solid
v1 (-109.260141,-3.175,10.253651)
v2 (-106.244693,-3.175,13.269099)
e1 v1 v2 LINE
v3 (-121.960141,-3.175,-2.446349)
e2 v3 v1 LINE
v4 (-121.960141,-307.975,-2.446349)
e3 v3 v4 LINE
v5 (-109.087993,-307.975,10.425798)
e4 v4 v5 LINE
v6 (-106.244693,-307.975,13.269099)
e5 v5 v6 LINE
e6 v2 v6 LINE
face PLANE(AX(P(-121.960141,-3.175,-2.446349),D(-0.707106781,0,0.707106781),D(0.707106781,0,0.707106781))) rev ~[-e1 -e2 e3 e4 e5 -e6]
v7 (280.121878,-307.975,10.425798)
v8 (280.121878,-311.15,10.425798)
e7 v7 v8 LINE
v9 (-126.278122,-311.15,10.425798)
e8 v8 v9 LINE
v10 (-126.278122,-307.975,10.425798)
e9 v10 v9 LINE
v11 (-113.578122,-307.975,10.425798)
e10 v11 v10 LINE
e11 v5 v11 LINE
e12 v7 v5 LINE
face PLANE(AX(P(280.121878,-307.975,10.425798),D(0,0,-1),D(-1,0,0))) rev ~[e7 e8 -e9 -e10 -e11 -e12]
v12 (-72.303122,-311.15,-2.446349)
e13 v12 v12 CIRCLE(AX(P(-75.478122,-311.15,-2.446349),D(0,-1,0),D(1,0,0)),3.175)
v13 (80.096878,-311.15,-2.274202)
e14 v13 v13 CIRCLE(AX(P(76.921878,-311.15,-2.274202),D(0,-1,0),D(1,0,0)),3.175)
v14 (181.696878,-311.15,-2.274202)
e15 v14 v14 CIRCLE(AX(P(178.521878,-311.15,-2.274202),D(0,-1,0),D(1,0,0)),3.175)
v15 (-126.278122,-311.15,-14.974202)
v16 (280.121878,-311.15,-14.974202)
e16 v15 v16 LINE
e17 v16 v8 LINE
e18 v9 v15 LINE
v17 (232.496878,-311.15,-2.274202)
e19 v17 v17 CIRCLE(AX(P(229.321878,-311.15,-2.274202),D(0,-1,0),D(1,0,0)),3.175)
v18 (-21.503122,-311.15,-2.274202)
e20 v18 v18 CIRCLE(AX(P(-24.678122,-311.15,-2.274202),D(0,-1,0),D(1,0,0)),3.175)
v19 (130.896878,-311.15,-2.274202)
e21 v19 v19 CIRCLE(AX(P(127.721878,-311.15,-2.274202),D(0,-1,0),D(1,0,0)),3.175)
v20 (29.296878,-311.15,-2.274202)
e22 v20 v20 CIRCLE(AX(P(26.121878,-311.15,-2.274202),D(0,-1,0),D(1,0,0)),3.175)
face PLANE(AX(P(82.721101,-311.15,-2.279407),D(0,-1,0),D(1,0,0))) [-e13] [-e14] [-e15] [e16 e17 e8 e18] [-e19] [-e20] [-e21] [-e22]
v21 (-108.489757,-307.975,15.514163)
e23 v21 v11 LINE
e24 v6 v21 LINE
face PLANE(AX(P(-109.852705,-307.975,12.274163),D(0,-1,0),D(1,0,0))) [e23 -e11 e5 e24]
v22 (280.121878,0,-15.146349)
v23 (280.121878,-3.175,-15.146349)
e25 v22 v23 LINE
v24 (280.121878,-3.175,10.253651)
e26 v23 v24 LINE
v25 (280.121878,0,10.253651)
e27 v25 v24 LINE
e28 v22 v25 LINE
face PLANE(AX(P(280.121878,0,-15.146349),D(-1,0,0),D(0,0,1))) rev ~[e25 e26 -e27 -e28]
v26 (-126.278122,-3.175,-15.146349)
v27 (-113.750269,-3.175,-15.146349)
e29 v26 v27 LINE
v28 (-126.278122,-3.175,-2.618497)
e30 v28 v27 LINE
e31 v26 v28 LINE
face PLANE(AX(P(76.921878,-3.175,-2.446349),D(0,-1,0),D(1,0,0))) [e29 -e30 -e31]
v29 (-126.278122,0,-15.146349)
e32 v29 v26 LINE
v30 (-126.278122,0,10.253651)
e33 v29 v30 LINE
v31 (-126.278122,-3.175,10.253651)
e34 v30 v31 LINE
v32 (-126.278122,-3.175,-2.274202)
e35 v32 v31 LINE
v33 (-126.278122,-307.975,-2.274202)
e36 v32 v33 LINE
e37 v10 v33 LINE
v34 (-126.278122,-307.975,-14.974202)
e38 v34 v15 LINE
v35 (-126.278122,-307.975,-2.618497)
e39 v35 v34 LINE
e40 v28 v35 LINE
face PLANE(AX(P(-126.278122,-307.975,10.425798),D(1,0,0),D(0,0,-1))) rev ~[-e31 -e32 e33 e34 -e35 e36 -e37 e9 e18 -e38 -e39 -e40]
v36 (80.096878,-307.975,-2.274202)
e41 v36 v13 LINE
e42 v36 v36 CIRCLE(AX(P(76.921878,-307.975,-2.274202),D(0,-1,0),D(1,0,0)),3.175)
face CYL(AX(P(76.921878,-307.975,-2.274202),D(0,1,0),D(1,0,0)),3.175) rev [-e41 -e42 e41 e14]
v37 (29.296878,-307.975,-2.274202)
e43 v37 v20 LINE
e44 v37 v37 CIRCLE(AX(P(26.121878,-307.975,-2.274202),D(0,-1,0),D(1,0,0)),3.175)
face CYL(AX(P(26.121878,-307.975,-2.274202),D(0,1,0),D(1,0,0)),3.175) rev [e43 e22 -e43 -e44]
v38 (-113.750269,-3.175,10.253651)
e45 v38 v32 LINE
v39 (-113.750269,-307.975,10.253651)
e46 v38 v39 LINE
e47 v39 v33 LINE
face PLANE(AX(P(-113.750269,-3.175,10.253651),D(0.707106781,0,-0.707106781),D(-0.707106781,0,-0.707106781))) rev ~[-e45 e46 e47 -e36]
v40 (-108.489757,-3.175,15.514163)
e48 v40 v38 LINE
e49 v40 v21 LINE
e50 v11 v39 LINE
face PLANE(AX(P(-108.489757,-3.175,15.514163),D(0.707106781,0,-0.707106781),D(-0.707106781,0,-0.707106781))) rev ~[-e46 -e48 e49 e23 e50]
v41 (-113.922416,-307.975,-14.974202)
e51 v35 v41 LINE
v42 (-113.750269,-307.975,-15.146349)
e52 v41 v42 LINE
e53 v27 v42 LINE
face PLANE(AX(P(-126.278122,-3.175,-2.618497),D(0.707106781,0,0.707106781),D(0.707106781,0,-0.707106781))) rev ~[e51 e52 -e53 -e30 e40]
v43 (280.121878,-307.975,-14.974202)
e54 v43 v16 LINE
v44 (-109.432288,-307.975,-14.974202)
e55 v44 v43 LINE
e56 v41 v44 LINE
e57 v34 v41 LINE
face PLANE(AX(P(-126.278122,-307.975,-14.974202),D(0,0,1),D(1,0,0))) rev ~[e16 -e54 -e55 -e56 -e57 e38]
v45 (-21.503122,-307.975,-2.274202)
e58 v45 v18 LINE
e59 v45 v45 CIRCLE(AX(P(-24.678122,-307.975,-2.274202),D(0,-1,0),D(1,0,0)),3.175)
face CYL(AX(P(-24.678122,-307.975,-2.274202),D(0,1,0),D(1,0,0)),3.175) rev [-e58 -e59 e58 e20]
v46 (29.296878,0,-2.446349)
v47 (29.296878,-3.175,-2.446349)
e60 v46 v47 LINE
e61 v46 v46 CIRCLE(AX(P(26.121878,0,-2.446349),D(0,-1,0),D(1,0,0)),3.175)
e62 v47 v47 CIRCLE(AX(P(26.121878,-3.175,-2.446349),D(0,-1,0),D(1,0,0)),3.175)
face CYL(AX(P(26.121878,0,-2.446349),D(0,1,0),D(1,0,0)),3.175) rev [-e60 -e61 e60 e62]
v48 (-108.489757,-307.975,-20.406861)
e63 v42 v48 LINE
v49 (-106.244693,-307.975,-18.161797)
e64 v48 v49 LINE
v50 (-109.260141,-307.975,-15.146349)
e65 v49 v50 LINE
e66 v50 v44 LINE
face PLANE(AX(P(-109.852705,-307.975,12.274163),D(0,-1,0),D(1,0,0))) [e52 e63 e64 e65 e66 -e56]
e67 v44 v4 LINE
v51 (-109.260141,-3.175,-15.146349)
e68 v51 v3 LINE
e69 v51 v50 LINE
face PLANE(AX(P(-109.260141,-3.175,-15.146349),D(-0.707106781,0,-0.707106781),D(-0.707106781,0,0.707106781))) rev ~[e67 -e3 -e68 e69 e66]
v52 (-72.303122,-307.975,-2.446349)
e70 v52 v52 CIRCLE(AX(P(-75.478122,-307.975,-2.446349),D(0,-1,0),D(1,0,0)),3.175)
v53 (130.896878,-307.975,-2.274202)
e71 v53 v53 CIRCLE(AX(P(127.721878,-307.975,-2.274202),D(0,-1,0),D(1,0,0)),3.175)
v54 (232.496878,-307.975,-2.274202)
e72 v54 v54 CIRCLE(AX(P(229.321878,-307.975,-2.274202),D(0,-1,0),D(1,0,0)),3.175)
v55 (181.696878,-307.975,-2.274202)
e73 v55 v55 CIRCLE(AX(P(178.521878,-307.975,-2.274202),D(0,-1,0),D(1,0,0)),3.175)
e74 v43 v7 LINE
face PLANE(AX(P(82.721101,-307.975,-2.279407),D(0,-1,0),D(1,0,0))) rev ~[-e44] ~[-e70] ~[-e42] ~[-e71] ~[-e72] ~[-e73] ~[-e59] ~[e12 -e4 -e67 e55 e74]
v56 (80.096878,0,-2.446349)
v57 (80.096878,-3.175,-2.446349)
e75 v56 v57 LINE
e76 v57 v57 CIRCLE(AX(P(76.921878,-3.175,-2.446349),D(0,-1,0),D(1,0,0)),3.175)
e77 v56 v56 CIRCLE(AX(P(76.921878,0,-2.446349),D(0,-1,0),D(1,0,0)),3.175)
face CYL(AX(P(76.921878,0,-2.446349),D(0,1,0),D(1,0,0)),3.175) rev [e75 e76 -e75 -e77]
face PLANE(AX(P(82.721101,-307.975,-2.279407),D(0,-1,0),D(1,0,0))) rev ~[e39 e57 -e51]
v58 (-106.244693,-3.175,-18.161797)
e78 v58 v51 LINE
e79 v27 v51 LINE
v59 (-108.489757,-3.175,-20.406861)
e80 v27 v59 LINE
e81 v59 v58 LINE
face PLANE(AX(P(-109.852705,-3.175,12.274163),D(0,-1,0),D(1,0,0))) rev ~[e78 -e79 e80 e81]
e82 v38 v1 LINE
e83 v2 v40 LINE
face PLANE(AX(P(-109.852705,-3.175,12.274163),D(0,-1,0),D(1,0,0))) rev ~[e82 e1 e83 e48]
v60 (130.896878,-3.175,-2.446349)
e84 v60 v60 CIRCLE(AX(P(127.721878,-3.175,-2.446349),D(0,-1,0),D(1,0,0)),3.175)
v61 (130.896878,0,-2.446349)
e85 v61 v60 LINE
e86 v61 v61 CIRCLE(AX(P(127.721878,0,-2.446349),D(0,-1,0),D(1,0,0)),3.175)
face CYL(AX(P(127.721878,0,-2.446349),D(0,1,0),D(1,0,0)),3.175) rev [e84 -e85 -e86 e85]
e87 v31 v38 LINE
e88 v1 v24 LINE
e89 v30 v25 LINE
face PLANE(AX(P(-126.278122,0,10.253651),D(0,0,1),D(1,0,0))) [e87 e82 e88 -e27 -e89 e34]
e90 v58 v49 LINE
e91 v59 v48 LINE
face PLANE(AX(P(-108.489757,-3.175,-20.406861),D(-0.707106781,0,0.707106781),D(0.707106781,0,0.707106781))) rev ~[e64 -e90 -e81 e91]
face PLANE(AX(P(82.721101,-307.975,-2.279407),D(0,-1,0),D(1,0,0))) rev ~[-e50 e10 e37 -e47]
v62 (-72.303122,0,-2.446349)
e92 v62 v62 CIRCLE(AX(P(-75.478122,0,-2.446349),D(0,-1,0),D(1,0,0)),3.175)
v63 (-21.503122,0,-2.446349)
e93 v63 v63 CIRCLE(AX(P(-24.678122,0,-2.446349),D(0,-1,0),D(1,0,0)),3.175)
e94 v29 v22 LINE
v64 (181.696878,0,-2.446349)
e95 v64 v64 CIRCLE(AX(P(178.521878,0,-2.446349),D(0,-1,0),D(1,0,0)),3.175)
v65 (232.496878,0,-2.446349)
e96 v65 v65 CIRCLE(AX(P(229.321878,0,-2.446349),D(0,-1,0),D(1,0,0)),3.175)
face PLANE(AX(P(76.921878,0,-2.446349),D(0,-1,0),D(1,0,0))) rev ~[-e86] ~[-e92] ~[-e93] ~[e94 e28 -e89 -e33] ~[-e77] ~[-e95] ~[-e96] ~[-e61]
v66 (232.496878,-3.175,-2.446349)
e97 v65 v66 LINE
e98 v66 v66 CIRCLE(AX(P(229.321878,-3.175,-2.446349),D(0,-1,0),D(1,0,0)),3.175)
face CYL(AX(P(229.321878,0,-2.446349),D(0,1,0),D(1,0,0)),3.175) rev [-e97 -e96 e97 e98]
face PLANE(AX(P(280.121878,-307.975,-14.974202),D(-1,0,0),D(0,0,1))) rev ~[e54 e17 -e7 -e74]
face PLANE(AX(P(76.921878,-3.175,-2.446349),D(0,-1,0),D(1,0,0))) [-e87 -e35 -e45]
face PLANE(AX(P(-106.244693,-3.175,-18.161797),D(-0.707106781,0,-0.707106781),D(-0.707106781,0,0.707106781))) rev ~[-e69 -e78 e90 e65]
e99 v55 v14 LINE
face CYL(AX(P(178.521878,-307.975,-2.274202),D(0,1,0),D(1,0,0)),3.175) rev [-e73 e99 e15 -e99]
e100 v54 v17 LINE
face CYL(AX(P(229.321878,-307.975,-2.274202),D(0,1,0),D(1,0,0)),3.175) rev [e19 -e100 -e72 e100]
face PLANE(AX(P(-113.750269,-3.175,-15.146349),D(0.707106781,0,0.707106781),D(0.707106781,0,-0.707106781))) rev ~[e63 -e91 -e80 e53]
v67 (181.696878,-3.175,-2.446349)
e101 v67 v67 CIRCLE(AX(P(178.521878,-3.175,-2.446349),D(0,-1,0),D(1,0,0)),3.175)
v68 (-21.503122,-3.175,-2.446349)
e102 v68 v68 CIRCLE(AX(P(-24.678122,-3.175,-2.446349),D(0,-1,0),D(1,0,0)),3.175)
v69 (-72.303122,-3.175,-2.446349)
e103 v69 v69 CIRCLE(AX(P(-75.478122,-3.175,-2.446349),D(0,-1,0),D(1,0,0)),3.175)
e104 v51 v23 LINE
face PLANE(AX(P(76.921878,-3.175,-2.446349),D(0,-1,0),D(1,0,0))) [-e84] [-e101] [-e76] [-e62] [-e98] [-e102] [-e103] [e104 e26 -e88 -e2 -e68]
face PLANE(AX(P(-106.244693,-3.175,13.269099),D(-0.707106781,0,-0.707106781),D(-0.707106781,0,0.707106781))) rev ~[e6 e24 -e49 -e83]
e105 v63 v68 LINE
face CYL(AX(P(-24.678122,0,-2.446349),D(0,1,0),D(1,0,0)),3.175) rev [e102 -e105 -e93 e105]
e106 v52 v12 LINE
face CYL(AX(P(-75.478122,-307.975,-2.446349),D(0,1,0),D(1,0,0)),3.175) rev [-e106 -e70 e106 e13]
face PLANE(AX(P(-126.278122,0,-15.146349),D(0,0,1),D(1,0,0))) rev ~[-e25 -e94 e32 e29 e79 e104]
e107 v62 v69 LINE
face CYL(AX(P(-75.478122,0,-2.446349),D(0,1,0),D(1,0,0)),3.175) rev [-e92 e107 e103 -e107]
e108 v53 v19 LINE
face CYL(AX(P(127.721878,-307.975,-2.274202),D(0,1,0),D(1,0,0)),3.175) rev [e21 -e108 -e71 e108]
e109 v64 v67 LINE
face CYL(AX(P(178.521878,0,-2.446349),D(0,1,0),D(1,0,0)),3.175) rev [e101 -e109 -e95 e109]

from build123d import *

# Parameters (mm, degrees)
F0_W     = 406.4
F0_H     = 25.4
F0_R     = 3.175
F1_DEPTH = 3.175
F3_DEPTH = 304.8
F4_R     = 3.175
F5_DEPTH = 3.175


# Not quite as in the source:
# - a length typed as a fraction of an inch, garbled in the dataset ("3 / 203.2 mm" for 3/8 in), is restored


with BuildPart() as f1:
    # F0 (on Front) → F1 (new body)
    with BuildSketch(Plane.XZ):
        with Locations((76.9218784556, -2.4463492446)):
            Rectangle(F0_W, F0_H)
        with Locations((-75.4781215444, -2.4463492446)):
            Circle(F0_R, mode=Mode.SUBTRACT)
        with Locations((-24.6781215444, -2.4463492446)):
            Circle(F0_R, mode=Mode.SUBTRACT)
        with Locations((26.1218784556, -2.4463492446)):
            Circle(F0_R, mode=Mode.SUBTRACT)
        with Locations((76.9218784556, -2.4463492446)):
            Circle(F0_R, mode=Mode.SUBTRACT)
        with Locations((127.7218784556, -2.4463492446)):
            Circle(F0_R, mode=Mode.SUBTRACT)
        with Locations((178.5218784556, -2.4463492446)):
            Circle(F0_R, mode=Mode.SUBTRACT)
        with Locations((229.3218784556, -2.4463492446)):
            Circle(F0_R, mode=Mode.SUBTRACT)
    extrude(amount=F1_DEPTH)

    # F2 (on face) → F3 (join)
    with BuildSketch(Plane.XZ.offset(3.175)):
        Polygon((-108.4897565831, 15.5141629976), (-113.7502688252, 10.2536507554), (-109.2601407647, 10.2536507554), (-106.2446925528, 13.2690989673), align=None)
        Polygon((-113.7502688252, 10.2536507554), (-126.2781215444, -2.2742019637), (-126.2781215444, -2.4463492446), (-126.2781215444, -2.6184965255), (-113.7502688252, -15.1463492446), (-109.2601407647, -15.1463492446), (-121.9601407647, -2.4463492446), (-109.2601407647, 10.2536507554), align=None)
        Polygon((-109.2601407647, -15.1463492446), (-113.7502688252, -15.1463492446), (-108.4897565831, -20.4068614867), (-106.2446925528, -18.1617974564), align=None)
    extrude(amount=F3_DEPTH)

    # F4 (on face) → F5 (join)
    with BuildSketch(Plane.XZ.offset(307.975)):
        Polygon((280.1218784556, 10.4257980363), (-109.0879934838, 10.4257980363), (-121.9601407647, -2.4463492446), (-109.4322880456, -14.9742019637), (280.1218784556, -14.9742019637), align=None)
        with Locations((-75.4781215444, -2.4463492446)):
            Circle(F4_R, mode=Mode.SUBTRACT)
        with Locations((-24.6781215444, -2.2742019637)):
            Circle(F4_R, mode=Mode.SUBTRACT)
        with Locations((26.1218784556, -2.2742019637)):
            Circle(F4_R, mode=Mode.SUBTRACT)
        with Locations((76.9218784556, -2.2742019637)):
            Circle(F4_R, mode=Mode.SUBTRACT)
        with Locations((127.7218784556, -2.2742019637)):
            Circle(F4_R, mode=Mode.SUBTRACT)
        with Locations((178.5218784556, -2.2742019637)):
            Circle(F4_R, mode=Mode.SUBTRACT)
        with Locations((229.3218784556, -2.2742019637)):
            Circle(F4_R, mode=Mode.SUBTRACT)
        Polygon((-126.2781215444, 10.4257980363), (-126.2781215444, -2.2742019637), (-113.5781215444, 10.4257980363), align=None)
        Polygon((-113.9224161061, -14.9742019637), (-126.2781215444, -2.6184965255), (-126.2781215444, -14.9742019637), align=None)
        Polygon((-113.5781215444, 10.4257980363), (-126.2781215444, -2.2742019637), (-126.2781215444, -2.6184965255), (-113.9224161061, -14.9742019637), (-109.4322880456, -14.9742019637), (-121.9601407647, -2.4463492446), (-109.0879934838, 10.4257980363), align=None)
    extrude(amount=F5_DEPTH)


solid = f1.part
